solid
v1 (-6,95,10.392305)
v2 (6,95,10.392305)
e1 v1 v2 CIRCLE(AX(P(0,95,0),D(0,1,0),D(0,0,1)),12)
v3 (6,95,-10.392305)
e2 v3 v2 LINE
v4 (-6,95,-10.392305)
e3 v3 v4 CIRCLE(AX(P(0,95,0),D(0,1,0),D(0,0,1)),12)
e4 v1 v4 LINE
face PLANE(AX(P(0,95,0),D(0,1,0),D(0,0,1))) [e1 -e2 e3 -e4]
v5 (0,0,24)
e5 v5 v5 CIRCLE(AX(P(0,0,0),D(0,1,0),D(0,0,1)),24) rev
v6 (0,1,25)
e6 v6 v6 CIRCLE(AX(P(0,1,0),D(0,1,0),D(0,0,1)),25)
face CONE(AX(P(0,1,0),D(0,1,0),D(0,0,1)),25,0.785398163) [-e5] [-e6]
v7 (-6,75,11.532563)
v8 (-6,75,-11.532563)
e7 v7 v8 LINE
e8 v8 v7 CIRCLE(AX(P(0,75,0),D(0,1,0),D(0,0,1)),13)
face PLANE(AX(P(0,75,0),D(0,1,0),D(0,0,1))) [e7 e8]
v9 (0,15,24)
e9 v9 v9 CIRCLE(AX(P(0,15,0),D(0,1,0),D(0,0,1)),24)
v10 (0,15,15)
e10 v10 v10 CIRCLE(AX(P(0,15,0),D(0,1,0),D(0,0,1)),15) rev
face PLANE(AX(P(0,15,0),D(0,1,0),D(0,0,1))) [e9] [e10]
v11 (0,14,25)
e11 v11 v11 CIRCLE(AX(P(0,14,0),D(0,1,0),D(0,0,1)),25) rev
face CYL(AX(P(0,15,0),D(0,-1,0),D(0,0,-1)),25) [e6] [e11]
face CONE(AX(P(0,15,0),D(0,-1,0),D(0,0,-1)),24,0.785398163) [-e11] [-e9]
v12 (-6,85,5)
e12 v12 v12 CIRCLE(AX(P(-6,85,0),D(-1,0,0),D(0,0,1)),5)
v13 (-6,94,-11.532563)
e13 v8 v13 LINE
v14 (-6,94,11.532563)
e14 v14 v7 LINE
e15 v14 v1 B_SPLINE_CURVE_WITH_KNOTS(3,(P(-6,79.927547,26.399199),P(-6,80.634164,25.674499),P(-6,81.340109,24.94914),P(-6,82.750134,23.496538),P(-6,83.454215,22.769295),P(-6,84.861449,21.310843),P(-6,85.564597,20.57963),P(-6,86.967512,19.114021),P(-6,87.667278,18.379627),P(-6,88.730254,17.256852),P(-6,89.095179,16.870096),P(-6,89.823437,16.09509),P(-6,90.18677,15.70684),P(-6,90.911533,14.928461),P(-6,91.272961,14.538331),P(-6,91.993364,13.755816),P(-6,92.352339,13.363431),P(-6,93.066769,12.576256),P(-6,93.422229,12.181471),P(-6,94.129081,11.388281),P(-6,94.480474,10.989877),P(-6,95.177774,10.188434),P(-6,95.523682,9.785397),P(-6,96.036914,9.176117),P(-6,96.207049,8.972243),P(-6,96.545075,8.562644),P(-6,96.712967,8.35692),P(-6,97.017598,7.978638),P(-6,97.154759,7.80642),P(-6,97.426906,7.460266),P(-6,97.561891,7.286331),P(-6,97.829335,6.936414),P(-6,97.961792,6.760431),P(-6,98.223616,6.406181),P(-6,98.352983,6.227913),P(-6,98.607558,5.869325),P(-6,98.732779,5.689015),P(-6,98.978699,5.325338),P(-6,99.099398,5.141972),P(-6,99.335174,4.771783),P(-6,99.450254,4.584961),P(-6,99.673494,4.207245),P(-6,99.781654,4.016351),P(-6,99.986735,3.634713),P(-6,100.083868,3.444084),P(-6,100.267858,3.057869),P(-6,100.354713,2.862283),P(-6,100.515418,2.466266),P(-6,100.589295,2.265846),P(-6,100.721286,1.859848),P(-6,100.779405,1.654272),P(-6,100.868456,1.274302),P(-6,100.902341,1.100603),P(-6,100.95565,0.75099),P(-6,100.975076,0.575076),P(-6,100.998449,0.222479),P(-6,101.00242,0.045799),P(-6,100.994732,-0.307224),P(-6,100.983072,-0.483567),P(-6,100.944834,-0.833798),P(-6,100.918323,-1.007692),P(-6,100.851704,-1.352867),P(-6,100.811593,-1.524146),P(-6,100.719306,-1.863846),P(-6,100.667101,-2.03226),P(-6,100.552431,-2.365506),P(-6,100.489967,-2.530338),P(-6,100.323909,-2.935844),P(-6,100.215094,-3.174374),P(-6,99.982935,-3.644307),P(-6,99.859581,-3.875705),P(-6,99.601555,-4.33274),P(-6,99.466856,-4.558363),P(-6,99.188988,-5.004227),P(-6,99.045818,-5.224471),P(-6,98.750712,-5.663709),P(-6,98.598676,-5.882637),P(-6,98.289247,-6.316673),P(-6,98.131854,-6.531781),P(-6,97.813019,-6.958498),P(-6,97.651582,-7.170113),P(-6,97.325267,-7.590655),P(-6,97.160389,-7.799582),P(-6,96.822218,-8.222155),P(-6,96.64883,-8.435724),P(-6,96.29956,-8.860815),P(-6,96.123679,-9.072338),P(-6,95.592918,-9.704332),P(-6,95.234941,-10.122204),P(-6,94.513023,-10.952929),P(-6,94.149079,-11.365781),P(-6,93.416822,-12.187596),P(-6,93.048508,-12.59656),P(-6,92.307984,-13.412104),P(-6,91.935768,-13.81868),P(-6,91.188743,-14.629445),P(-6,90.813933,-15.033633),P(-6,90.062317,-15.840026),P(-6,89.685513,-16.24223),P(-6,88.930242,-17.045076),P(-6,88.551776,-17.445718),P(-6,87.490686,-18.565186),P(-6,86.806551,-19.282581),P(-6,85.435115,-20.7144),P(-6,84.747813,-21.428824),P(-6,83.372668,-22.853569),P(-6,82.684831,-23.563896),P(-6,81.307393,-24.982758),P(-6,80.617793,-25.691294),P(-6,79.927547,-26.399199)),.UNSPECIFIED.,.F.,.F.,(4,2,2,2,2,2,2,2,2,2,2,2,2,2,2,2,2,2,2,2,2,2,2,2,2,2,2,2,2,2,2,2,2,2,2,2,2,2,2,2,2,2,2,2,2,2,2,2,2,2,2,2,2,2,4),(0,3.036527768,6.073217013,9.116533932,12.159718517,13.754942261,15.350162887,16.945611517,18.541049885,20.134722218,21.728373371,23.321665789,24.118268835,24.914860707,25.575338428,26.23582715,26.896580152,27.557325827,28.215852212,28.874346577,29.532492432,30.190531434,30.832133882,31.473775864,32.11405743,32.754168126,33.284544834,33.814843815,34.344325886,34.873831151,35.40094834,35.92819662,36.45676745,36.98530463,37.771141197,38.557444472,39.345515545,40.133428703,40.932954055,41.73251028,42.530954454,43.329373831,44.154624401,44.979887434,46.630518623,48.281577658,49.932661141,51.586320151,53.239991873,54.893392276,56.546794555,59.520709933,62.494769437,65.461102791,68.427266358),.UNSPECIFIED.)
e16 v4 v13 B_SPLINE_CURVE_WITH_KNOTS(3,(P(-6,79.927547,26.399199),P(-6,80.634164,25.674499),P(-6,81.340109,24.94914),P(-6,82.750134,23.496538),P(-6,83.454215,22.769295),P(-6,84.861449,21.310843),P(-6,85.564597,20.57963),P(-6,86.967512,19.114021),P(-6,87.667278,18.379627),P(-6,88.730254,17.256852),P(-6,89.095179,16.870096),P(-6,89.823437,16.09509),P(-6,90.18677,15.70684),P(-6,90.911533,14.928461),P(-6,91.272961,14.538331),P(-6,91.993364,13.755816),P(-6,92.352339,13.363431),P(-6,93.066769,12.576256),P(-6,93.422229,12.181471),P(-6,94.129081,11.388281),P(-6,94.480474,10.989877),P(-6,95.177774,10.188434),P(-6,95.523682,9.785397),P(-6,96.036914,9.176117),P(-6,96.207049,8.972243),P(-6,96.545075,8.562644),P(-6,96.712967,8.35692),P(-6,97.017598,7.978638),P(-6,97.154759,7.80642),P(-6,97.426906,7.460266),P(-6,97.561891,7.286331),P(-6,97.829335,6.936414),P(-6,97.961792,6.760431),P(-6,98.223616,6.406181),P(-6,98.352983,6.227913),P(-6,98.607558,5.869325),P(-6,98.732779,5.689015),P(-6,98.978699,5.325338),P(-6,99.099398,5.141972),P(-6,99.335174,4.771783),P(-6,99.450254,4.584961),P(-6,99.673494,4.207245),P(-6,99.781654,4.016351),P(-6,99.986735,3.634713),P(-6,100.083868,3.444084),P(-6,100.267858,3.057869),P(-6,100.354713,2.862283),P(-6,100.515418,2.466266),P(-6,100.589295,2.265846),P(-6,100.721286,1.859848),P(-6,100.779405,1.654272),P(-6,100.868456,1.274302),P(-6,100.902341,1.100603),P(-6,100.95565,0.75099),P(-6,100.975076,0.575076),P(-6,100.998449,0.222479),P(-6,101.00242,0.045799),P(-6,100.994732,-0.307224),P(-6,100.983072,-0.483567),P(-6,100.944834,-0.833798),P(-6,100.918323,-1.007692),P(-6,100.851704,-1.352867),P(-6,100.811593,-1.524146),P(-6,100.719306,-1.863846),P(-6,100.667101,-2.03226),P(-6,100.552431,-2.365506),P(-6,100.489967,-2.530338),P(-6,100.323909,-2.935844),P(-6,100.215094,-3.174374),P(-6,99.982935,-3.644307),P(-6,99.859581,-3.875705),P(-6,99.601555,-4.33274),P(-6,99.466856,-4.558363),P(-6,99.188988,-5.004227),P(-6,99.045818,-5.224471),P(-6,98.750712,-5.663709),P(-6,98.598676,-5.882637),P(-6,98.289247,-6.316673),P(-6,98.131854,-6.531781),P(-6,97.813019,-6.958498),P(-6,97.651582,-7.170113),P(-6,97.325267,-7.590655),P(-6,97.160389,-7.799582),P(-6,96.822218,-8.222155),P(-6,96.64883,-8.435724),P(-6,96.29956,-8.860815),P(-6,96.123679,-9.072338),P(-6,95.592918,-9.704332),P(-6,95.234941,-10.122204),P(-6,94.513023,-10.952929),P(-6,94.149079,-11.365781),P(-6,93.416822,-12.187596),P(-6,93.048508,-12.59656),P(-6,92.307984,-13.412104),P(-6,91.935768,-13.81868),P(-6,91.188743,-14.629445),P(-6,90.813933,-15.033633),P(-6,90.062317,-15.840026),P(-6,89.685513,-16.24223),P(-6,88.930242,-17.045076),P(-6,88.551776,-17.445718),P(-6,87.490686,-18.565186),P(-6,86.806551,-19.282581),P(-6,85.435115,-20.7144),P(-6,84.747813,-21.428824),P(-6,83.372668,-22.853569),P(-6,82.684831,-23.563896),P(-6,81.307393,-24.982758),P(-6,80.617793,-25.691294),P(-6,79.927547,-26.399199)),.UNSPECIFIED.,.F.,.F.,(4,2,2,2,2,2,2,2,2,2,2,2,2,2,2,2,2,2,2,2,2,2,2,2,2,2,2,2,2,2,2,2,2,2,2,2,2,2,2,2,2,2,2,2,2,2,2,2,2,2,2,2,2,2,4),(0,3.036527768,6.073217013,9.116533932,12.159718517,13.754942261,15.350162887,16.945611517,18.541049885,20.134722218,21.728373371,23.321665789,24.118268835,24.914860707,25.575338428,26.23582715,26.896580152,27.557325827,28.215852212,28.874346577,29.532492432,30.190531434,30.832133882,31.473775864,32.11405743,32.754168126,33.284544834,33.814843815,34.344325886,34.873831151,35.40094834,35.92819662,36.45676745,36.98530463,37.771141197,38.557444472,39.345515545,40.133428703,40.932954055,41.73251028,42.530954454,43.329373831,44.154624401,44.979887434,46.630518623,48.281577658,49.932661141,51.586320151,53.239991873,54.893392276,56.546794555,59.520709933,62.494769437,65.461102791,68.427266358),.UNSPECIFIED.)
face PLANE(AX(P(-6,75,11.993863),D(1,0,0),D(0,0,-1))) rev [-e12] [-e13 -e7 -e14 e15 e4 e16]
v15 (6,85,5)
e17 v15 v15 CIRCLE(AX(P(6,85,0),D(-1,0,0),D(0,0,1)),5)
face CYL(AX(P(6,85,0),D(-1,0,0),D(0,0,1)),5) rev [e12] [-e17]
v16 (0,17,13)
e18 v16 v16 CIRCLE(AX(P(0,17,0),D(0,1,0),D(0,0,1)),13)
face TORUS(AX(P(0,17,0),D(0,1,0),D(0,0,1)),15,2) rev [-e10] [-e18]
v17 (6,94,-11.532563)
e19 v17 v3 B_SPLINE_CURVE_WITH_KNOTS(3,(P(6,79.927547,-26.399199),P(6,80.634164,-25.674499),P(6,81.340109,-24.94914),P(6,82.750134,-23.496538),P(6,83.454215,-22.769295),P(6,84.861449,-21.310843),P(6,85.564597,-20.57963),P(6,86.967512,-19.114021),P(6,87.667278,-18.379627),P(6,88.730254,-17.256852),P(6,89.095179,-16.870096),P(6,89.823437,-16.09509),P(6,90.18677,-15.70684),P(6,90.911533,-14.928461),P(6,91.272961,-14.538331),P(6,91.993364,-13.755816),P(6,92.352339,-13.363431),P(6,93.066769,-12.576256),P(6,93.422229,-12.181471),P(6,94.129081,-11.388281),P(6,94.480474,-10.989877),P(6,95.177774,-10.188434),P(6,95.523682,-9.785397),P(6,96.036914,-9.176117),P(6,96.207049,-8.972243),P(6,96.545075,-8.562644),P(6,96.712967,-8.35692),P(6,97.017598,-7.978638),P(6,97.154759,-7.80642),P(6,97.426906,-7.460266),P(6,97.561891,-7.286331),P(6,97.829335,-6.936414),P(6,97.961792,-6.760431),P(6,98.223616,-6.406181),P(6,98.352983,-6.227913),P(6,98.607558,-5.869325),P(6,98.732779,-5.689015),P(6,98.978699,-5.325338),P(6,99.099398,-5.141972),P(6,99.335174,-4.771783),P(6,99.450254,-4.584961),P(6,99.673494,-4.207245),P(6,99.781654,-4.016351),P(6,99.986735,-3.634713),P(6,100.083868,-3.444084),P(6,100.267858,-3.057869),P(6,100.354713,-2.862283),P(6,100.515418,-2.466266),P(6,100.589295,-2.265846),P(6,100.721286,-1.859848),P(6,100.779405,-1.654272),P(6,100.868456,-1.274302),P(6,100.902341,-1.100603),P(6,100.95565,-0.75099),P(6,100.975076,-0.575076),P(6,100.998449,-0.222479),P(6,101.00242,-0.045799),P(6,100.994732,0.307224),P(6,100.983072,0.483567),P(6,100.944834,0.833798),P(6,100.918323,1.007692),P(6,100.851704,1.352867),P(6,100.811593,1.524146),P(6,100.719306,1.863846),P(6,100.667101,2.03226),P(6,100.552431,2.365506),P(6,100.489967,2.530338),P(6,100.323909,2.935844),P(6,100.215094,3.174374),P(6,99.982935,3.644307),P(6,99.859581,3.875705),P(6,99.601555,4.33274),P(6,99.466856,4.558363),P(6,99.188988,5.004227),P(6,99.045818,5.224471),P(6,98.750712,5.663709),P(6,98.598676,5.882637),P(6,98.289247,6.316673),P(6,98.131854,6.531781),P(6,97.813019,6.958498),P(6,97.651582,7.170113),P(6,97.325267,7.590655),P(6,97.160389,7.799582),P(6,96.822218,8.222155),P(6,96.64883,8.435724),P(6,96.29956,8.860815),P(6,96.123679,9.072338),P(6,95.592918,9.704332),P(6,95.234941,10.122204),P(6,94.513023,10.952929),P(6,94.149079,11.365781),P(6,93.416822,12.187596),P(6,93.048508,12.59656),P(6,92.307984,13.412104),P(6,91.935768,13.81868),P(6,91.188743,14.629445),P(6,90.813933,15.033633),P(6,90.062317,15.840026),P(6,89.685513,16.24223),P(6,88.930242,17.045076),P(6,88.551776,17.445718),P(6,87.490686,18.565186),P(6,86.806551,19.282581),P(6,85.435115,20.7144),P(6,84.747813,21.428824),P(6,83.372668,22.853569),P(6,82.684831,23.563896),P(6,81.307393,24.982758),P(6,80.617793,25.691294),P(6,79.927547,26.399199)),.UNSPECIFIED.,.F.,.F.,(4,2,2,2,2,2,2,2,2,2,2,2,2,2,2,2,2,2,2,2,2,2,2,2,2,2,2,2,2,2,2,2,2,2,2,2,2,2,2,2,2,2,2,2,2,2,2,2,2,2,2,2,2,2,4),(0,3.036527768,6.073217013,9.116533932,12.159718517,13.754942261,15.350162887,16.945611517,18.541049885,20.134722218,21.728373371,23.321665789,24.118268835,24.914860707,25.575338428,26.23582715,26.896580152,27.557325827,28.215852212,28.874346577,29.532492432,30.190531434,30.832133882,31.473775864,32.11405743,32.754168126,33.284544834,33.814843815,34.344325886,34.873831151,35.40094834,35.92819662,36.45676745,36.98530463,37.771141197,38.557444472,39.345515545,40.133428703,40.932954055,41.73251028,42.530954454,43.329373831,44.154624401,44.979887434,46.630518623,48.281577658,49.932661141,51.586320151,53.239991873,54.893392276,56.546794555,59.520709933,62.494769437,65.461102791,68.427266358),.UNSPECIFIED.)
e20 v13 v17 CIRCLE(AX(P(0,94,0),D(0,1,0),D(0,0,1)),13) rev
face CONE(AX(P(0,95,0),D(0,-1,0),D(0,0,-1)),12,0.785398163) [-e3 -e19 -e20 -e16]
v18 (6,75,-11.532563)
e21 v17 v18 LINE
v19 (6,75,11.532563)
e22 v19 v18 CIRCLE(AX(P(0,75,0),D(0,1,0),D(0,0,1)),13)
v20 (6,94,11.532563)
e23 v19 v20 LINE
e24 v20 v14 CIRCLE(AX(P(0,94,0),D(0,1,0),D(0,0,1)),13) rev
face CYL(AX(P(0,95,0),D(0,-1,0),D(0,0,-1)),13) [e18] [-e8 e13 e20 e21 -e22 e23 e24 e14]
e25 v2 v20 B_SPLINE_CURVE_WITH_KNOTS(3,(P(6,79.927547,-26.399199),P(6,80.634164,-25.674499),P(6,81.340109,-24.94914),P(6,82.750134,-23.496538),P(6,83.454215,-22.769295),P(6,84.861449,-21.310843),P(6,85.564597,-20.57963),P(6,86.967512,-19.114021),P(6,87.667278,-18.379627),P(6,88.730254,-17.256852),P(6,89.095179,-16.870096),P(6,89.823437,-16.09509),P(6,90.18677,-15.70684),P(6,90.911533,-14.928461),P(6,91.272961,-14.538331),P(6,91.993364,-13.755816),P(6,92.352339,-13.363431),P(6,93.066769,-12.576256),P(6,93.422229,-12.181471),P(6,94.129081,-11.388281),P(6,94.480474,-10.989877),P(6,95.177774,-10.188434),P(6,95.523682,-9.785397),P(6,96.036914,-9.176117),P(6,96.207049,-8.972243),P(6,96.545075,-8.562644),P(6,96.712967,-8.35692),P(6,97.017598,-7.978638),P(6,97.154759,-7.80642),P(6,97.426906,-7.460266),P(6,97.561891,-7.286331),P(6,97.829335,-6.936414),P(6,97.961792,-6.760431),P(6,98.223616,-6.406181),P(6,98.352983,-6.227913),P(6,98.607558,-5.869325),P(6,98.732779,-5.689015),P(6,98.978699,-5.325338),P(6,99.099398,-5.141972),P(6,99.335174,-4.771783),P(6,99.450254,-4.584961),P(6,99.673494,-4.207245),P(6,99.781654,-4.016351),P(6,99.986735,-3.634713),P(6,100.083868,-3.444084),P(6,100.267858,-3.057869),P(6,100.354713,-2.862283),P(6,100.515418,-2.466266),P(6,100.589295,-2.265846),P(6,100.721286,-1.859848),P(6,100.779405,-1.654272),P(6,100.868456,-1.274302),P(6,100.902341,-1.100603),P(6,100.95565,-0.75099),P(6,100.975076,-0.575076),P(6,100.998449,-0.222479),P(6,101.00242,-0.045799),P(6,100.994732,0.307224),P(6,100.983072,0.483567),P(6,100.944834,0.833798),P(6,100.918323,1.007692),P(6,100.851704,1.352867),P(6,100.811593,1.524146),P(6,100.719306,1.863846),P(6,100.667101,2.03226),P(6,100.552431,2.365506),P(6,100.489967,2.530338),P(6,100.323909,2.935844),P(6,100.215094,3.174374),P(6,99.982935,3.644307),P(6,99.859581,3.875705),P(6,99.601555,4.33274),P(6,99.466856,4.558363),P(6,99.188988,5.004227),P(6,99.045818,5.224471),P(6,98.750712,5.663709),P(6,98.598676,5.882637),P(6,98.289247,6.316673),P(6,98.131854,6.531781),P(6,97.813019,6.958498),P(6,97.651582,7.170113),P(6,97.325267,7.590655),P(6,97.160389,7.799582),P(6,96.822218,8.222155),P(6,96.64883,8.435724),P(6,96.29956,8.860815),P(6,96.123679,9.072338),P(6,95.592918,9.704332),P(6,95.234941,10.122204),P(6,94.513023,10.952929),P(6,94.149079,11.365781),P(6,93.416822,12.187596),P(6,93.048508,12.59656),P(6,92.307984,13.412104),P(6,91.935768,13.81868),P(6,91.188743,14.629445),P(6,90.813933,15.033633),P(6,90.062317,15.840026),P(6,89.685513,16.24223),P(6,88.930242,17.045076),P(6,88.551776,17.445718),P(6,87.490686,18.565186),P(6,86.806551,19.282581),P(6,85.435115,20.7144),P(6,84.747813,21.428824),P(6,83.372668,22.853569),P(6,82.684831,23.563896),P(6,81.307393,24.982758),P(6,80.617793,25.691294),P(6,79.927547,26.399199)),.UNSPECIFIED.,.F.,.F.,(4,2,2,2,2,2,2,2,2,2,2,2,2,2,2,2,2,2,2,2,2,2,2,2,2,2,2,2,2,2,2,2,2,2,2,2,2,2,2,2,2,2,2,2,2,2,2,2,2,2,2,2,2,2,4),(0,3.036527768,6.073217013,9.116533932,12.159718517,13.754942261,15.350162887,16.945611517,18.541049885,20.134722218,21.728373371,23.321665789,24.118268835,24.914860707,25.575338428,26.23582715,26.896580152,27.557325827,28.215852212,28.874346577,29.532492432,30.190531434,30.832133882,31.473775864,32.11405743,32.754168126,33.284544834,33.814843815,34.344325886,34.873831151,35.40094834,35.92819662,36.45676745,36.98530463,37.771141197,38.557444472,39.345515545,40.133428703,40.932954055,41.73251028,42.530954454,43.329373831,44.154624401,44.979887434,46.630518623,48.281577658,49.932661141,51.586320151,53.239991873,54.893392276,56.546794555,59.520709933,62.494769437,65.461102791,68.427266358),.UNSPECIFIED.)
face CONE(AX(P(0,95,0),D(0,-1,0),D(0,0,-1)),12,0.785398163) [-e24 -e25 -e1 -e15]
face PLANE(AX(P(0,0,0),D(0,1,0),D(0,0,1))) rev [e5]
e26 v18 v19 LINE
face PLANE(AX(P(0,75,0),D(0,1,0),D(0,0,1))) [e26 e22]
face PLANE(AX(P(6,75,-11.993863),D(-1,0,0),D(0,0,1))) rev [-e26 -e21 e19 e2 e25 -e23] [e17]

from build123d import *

# Parameters (mm, degrees)
SZKIC2_R                    = 25
DODANIE_WYCI_GNI_CIE1_DEPTH = 15
SZKIC3_R                    = 13
DODANIE_WYCI_GNI_CIE2_DEPTH = 80
CHAMFER2_SIZE               = 1
CHAMFER3_SIZE               = 1
FILLET1_R                   = 2
CUT_EXTRUDE1_DEPTH          = 20
SKETCH4_R                   = 5
CUT_EXTRUDE3_DEPTH          = 12


with BuildPart() as part:
    # Szkic2 → Dodanie-wyciągnięcie1 (new body)
    with BuildSketch(Plane(origin=(0, 0, 0), x_dir=(1, 0, 0), z_dir=(0, 1, 0))):
        with Locations(Location((0, 0, 0), (0, 0, 270))):
            Circle(SZKIC2_R)
    extrude(amount=DODANIE_WYCI_GNI_CIE1_DEPTH)

    # Szkic3 → Dodanie-wyciągnięcie2 (add)
    with BuildSketch(Plane(origin=(0, 15, 0), x_dir=(1, 0, 0), z_dir=(0, 1, 0))):
        with Locations(Location((0, 0, 0), (0, 0, 270))):
            Circle(SZKIC3_R)
    extrude(amount=DODANIE_WYCI_GNI_CIE2_DEPTH)

    # Chamfer1: read off the stored shape, not the designer's step
    # Chamfer1 outline → Chamfer1 (revolve, cut)
    with BuildSketch(Plane.XY):
        Polygon((25, 15), (24, 15), (25, 14), align=None)
    revolve(axis=Axis((0, 0, 0), (0, 1, 0)), mode=Mode.SUBTRACT)

    # Chamfer2
    chamfer2_edges = [part.edges().sort_by_distance(p)[0] for p in [
        (0, 0, -25),
    ]]
    chamfer(chamfer2_edges, length=CHAMFER2_SIZE)

    # Chamfer3
    chamfer3_edges = [part.edges().sort_by_distance(p)[0] for p in [
        (0, 95, -13),
    ]]
    chamfer(chamfer3_edges, length=CHAMFER3_SIZE)

    # Fillet1
    fillet1_edges = [part.edges().sort_by_distance(p)[0] for p in [
        (0, 15, -13),
    ]]
    fillet(fillet1_edges, radius=FILLET1_R)

    # Sketch2 → Cut-Extrude1 (cut)
    with BuildSketch(Plane(origin=(0, 95, 0), x_dir=(1, 0, 0), z_dir=(0, 1, 0))):
        with BuildLine():
            Line((6, 11.993862748), (6, -11.993862748))
            ThreePointArc((6, -11.993862748), (13.41091882, 0), (6, 11.993862748))
        make_face()
        with BuildLine():
            Line((-6, -11.993862748), (-6, 11.993862748))
            ThreePointArc((-6, 11.993862748), (-13.41091882, 0), (-6, -11.993862748))
        make_face()
    extrude(amount=-CUT_EXTRUDE1_DEPTH, mode=Mode.SUBTRACT)

    # Sketch4 → Cut-Extrude3 (cut)
    with BuildSketch(Plane.ZY.offset(6)):
        with Locations((0, 85)):
            Circle(SKETCH4_R)
    extrude(amount=-CUT_EXTRUDE3_DEPTH, mode=Mode.SUBTRACT)


solid = part.part
